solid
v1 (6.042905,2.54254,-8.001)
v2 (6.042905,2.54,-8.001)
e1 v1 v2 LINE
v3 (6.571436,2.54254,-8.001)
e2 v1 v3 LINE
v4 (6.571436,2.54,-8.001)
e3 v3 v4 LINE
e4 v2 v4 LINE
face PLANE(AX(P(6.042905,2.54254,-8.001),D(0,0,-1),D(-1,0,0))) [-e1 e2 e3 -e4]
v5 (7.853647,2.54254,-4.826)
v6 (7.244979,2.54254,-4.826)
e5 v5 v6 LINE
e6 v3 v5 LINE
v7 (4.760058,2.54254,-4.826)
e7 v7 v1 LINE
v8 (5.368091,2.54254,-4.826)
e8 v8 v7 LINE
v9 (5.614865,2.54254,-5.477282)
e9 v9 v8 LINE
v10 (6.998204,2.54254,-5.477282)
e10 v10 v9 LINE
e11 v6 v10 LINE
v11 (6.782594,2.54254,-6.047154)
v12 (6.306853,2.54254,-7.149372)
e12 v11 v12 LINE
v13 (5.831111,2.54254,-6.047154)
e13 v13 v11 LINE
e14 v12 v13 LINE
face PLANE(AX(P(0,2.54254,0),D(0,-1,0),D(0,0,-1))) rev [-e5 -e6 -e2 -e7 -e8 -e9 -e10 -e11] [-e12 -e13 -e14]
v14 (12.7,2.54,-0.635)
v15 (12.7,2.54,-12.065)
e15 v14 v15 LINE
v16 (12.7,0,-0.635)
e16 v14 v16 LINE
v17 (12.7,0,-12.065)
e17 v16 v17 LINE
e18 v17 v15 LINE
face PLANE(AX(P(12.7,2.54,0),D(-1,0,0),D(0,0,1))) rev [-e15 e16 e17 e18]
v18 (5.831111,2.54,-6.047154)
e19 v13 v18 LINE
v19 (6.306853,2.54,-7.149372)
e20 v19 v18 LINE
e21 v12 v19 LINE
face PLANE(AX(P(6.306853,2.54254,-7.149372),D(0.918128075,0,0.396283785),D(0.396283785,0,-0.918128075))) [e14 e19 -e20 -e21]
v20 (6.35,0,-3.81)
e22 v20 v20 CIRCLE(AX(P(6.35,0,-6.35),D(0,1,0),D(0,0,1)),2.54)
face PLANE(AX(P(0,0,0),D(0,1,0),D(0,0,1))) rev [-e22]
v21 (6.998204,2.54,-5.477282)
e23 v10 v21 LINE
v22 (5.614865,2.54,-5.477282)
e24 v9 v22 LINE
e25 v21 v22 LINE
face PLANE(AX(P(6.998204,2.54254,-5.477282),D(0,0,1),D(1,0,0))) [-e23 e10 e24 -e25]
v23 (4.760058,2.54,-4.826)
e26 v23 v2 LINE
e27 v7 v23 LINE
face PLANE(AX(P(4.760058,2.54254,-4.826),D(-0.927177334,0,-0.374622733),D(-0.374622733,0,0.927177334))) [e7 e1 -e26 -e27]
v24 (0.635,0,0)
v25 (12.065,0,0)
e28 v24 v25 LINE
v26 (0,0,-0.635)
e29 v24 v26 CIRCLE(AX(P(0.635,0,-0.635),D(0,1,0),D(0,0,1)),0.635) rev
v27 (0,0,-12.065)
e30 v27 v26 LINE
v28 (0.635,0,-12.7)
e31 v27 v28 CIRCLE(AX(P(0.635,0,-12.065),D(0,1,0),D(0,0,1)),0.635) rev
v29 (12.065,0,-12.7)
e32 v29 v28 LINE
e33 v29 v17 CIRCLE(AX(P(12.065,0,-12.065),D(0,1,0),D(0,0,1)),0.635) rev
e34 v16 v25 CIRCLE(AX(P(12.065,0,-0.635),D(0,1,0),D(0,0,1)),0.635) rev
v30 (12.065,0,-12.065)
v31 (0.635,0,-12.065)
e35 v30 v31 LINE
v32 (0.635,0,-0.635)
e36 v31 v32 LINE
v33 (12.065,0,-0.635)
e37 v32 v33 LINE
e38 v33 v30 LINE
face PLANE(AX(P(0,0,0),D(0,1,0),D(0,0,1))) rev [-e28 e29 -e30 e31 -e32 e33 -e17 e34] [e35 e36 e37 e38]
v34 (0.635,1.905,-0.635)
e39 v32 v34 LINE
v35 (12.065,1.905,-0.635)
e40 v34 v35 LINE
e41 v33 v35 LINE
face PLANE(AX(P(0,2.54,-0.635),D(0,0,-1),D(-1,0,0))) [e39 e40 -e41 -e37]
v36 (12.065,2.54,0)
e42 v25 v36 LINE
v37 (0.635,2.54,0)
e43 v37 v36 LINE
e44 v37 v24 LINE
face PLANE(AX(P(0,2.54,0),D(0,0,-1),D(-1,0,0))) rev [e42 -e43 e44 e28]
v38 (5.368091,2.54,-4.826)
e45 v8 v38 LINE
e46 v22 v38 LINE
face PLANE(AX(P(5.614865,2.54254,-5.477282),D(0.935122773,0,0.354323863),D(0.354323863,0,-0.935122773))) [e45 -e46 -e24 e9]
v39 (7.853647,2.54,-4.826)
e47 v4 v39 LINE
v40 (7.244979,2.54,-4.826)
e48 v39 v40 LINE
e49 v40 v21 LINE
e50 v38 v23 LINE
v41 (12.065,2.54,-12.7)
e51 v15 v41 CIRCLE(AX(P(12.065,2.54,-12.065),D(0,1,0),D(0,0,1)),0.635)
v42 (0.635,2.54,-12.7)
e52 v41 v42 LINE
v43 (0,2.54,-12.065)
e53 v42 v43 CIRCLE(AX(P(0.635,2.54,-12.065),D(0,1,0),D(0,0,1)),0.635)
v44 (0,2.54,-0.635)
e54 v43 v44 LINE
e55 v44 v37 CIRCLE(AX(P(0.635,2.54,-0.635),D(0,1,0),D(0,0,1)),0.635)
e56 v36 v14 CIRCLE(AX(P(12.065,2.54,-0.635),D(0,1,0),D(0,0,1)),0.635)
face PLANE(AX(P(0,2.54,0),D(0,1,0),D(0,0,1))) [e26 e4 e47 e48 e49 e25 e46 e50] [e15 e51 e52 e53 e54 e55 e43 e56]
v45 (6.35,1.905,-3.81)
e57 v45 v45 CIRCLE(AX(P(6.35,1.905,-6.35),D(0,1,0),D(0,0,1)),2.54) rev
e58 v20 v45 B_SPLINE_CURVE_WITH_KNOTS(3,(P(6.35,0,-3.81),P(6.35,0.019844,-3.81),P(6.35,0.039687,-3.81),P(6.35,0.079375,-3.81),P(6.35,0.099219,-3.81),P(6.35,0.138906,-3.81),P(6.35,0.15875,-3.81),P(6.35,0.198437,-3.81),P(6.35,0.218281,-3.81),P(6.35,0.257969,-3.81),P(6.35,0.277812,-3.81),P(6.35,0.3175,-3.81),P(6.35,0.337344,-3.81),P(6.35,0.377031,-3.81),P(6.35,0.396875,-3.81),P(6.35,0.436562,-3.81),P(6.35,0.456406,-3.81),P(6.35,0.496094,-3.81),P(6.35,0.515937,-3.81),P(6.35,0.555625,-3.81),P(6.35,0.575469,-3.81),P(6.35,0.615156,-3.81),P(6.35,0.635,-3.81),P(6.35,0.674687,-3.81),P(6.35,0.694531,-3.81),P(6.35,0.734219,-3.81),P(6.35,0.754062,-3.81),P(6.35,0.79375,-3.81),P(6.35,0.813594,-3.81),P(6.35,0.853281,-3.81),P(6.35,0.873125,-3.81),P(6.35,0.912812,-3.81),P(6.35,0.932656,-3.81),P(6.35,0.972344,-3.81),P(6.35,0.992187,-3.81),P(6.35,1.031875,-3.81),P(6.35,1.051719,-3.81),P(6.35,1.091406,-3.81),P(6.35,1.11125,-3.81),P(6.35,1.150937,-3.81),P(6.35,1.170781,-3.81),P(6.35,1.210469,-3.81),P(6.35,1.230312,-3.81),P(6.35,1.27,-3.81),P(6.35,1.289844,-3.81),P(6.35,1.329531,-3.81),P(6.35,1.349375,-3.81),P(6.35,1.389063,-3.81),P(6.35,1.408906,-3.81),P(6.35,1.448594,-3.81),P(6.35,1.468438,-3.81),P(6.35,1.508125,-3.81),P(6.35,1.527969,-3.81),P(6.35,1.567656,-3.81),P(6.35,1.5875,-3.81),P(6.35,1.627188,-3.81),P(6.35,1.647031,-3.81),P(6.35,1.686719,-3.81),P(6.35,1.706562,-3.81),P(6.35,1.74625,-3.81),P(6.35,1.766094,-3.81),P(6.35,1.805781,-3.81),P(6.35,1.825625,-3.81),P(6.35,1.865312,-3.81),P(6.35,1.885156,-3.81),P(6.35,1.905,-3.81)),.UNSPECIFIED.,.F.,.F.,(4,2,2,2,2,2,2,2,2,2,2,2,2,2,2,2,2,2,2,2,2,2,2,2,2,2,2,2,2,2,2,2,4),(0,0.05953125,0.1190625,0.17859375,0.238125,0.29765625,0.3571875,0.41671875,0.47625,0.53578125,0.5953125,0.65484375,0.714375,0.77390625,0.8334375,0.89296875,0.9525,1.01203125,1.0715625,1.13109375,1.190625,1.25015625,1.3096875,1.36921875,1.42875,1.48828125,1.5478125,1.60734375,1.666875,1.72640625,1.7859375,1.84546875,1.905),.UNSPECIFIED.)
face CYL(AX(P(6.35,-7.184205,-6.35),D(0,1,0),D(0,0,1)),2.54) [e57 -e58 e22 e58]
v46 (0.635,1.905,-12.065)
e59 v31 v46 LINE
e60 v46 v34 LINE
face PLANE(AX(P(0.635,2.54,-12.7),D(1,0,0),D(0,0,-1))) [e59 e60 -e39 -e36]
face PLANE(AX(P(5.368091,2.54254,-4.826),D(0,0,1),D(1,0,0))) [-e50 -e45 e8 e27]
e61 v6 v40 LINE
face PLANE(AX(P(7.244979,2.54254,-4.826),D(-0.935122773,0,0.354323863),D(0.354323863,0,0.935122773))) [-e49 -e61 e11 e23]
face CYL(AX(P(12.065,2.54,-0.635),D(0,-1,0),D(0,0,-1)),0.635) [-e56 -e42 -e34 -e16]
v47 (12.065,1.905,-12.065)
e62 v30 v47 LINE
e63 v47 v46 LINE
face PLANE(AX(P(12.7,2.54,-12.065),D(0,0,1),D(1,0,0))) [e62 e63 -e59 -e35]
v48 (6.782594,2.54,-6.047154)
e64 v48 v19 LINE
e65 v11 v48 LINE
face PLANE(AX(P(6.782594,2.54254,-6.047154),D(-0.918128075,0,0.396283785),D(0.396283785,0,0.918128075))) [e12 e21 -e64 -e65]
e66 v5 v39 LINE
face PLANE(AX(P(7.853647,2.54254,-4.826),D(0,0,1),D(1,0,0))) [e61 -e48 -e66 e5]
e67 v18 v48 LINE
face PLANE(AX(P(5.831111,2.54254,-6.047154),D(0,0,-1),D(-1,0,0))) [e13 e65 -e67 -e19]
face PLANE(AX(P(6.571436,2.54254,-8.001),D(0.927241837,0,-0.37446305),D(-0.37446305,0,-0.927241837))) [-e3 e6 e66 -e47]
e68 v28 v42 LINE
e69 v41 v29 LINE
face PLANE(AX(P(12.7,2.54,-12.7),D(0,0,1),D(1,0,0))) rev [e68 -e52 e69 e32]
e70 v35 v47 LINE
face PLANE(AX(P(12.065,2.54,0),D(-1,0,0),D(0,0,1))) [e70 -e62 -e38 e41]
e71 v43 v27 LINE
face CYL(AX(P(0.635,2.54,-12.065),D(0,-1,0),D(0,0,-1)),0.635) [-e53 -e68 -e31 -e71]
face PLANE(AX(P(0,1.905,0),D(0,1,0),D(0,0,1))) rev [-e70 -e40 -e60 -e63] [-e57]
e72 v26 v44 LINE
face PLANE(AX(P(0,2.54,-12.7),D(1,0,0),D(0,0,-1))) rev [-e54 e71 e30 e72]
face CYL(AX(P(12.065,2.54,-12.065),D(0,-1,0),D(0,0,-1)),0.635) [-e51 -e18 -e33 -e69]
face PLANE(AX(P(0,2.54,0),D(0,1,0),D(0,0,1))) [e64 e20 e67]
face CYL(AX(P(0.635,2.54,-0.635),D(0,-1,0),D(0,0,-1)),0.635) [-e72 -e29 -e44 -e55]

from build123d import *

# Parameters (mm, degrees)
SKETCH1_W           = 12.7
SKETCH1_H           = 12.7
BOSS_EXTRUDE1_DEPTH = 2.54
FILLET1_R           = 0.635
SHELL1_START        = 0.635
SHELL1_OUTLINE_W    = 1.905
SHELL1_OUTLINE_H    = 11.43
SHELL1_DEPTH        = 11.43
SKETCH2_R           = 2.54
BOSS_EXTRUDE2_DEPTH = 1.905
BOSS_EXTRUDE3_DEPTH = 0.00254


# Read off the part's stored shape, not the designer's step: Shell1
with BuildPart() as part:
    # Sketch1 → Boss-Extrude1 (new body)
    with BuildSketch(Plane(origin=(0, 0, 0), x_dir=(1, 0, 0), z_dir=(0, 1, 0))):
        with Locations((6.35, 6.35)):
            Rectangle(SKETCH1_W, SKETCH1_H)
    extrude(amount=BOSS_EXTRUDE1_DEPTH)

    # Fillet1
    fillet1_edges = [part.edges().sort_by_distance(p)[0] for p in [
        (0, 1.27, -12.7),
        (12.7, 1.27, -12.7),
        (12.7, 1.27, 0),
        (0, 1.27, 0),
    ]]
    fillet(fillet1_edges, radius=FILLET1_R)

    # Shell1 outline → Shell1 (cut)
    with BuildSketch(Plane.YZ.offset(SHELL1_START)):
        with Locations((0.9525, -6.35)):
            Rectangle(SHELL1_OUTLINE_W, SHELL1_OUTLINE_H)
    extrude(amount=SHELL1_DEPTH, mode=Mode.SUBTRACT)

    # Sketch2 → Boss-Extrude2 (add)
    with BuildSketch(Plane(origin=(0, 1.905, 0), x_dir=(-1, 0, 0), z_dir=(0, -1, 0))):
        with Locations(Location((-6.35, 6.35, 0), (0, 0, 270))):
            Circle(SKETCH2_R)
    extrude(amount=BOSS_EXTRUDE2_DEPTH)

    # Sketch3 → Boss-Extrude3 (add)
    with BuildSketch(Plane(origin=(0, 2.54, 0), x_dir=(1, 0, 0), z_dir=(0, 1, 0))):
        Polygon((6.042905248, 8.001), (6.571435897, 8.001), (7.853647436, 4.826), (7.244978566, 4.826), (6.998203726, 5.477282051), (5.614865385, 5.477282051), (5.368090545, 4.826), (4.760057692, 4.826), align=None)
        Polygon((6.306852564, 7.149372396), (5.831111378, 6.047153846), (6.78259375, 6.047153846), align=None, mode=Mode.SUBTRACT)
    extrude(amount=BOSS_EXTRUDE3_DEPTH)


solid = part.part
